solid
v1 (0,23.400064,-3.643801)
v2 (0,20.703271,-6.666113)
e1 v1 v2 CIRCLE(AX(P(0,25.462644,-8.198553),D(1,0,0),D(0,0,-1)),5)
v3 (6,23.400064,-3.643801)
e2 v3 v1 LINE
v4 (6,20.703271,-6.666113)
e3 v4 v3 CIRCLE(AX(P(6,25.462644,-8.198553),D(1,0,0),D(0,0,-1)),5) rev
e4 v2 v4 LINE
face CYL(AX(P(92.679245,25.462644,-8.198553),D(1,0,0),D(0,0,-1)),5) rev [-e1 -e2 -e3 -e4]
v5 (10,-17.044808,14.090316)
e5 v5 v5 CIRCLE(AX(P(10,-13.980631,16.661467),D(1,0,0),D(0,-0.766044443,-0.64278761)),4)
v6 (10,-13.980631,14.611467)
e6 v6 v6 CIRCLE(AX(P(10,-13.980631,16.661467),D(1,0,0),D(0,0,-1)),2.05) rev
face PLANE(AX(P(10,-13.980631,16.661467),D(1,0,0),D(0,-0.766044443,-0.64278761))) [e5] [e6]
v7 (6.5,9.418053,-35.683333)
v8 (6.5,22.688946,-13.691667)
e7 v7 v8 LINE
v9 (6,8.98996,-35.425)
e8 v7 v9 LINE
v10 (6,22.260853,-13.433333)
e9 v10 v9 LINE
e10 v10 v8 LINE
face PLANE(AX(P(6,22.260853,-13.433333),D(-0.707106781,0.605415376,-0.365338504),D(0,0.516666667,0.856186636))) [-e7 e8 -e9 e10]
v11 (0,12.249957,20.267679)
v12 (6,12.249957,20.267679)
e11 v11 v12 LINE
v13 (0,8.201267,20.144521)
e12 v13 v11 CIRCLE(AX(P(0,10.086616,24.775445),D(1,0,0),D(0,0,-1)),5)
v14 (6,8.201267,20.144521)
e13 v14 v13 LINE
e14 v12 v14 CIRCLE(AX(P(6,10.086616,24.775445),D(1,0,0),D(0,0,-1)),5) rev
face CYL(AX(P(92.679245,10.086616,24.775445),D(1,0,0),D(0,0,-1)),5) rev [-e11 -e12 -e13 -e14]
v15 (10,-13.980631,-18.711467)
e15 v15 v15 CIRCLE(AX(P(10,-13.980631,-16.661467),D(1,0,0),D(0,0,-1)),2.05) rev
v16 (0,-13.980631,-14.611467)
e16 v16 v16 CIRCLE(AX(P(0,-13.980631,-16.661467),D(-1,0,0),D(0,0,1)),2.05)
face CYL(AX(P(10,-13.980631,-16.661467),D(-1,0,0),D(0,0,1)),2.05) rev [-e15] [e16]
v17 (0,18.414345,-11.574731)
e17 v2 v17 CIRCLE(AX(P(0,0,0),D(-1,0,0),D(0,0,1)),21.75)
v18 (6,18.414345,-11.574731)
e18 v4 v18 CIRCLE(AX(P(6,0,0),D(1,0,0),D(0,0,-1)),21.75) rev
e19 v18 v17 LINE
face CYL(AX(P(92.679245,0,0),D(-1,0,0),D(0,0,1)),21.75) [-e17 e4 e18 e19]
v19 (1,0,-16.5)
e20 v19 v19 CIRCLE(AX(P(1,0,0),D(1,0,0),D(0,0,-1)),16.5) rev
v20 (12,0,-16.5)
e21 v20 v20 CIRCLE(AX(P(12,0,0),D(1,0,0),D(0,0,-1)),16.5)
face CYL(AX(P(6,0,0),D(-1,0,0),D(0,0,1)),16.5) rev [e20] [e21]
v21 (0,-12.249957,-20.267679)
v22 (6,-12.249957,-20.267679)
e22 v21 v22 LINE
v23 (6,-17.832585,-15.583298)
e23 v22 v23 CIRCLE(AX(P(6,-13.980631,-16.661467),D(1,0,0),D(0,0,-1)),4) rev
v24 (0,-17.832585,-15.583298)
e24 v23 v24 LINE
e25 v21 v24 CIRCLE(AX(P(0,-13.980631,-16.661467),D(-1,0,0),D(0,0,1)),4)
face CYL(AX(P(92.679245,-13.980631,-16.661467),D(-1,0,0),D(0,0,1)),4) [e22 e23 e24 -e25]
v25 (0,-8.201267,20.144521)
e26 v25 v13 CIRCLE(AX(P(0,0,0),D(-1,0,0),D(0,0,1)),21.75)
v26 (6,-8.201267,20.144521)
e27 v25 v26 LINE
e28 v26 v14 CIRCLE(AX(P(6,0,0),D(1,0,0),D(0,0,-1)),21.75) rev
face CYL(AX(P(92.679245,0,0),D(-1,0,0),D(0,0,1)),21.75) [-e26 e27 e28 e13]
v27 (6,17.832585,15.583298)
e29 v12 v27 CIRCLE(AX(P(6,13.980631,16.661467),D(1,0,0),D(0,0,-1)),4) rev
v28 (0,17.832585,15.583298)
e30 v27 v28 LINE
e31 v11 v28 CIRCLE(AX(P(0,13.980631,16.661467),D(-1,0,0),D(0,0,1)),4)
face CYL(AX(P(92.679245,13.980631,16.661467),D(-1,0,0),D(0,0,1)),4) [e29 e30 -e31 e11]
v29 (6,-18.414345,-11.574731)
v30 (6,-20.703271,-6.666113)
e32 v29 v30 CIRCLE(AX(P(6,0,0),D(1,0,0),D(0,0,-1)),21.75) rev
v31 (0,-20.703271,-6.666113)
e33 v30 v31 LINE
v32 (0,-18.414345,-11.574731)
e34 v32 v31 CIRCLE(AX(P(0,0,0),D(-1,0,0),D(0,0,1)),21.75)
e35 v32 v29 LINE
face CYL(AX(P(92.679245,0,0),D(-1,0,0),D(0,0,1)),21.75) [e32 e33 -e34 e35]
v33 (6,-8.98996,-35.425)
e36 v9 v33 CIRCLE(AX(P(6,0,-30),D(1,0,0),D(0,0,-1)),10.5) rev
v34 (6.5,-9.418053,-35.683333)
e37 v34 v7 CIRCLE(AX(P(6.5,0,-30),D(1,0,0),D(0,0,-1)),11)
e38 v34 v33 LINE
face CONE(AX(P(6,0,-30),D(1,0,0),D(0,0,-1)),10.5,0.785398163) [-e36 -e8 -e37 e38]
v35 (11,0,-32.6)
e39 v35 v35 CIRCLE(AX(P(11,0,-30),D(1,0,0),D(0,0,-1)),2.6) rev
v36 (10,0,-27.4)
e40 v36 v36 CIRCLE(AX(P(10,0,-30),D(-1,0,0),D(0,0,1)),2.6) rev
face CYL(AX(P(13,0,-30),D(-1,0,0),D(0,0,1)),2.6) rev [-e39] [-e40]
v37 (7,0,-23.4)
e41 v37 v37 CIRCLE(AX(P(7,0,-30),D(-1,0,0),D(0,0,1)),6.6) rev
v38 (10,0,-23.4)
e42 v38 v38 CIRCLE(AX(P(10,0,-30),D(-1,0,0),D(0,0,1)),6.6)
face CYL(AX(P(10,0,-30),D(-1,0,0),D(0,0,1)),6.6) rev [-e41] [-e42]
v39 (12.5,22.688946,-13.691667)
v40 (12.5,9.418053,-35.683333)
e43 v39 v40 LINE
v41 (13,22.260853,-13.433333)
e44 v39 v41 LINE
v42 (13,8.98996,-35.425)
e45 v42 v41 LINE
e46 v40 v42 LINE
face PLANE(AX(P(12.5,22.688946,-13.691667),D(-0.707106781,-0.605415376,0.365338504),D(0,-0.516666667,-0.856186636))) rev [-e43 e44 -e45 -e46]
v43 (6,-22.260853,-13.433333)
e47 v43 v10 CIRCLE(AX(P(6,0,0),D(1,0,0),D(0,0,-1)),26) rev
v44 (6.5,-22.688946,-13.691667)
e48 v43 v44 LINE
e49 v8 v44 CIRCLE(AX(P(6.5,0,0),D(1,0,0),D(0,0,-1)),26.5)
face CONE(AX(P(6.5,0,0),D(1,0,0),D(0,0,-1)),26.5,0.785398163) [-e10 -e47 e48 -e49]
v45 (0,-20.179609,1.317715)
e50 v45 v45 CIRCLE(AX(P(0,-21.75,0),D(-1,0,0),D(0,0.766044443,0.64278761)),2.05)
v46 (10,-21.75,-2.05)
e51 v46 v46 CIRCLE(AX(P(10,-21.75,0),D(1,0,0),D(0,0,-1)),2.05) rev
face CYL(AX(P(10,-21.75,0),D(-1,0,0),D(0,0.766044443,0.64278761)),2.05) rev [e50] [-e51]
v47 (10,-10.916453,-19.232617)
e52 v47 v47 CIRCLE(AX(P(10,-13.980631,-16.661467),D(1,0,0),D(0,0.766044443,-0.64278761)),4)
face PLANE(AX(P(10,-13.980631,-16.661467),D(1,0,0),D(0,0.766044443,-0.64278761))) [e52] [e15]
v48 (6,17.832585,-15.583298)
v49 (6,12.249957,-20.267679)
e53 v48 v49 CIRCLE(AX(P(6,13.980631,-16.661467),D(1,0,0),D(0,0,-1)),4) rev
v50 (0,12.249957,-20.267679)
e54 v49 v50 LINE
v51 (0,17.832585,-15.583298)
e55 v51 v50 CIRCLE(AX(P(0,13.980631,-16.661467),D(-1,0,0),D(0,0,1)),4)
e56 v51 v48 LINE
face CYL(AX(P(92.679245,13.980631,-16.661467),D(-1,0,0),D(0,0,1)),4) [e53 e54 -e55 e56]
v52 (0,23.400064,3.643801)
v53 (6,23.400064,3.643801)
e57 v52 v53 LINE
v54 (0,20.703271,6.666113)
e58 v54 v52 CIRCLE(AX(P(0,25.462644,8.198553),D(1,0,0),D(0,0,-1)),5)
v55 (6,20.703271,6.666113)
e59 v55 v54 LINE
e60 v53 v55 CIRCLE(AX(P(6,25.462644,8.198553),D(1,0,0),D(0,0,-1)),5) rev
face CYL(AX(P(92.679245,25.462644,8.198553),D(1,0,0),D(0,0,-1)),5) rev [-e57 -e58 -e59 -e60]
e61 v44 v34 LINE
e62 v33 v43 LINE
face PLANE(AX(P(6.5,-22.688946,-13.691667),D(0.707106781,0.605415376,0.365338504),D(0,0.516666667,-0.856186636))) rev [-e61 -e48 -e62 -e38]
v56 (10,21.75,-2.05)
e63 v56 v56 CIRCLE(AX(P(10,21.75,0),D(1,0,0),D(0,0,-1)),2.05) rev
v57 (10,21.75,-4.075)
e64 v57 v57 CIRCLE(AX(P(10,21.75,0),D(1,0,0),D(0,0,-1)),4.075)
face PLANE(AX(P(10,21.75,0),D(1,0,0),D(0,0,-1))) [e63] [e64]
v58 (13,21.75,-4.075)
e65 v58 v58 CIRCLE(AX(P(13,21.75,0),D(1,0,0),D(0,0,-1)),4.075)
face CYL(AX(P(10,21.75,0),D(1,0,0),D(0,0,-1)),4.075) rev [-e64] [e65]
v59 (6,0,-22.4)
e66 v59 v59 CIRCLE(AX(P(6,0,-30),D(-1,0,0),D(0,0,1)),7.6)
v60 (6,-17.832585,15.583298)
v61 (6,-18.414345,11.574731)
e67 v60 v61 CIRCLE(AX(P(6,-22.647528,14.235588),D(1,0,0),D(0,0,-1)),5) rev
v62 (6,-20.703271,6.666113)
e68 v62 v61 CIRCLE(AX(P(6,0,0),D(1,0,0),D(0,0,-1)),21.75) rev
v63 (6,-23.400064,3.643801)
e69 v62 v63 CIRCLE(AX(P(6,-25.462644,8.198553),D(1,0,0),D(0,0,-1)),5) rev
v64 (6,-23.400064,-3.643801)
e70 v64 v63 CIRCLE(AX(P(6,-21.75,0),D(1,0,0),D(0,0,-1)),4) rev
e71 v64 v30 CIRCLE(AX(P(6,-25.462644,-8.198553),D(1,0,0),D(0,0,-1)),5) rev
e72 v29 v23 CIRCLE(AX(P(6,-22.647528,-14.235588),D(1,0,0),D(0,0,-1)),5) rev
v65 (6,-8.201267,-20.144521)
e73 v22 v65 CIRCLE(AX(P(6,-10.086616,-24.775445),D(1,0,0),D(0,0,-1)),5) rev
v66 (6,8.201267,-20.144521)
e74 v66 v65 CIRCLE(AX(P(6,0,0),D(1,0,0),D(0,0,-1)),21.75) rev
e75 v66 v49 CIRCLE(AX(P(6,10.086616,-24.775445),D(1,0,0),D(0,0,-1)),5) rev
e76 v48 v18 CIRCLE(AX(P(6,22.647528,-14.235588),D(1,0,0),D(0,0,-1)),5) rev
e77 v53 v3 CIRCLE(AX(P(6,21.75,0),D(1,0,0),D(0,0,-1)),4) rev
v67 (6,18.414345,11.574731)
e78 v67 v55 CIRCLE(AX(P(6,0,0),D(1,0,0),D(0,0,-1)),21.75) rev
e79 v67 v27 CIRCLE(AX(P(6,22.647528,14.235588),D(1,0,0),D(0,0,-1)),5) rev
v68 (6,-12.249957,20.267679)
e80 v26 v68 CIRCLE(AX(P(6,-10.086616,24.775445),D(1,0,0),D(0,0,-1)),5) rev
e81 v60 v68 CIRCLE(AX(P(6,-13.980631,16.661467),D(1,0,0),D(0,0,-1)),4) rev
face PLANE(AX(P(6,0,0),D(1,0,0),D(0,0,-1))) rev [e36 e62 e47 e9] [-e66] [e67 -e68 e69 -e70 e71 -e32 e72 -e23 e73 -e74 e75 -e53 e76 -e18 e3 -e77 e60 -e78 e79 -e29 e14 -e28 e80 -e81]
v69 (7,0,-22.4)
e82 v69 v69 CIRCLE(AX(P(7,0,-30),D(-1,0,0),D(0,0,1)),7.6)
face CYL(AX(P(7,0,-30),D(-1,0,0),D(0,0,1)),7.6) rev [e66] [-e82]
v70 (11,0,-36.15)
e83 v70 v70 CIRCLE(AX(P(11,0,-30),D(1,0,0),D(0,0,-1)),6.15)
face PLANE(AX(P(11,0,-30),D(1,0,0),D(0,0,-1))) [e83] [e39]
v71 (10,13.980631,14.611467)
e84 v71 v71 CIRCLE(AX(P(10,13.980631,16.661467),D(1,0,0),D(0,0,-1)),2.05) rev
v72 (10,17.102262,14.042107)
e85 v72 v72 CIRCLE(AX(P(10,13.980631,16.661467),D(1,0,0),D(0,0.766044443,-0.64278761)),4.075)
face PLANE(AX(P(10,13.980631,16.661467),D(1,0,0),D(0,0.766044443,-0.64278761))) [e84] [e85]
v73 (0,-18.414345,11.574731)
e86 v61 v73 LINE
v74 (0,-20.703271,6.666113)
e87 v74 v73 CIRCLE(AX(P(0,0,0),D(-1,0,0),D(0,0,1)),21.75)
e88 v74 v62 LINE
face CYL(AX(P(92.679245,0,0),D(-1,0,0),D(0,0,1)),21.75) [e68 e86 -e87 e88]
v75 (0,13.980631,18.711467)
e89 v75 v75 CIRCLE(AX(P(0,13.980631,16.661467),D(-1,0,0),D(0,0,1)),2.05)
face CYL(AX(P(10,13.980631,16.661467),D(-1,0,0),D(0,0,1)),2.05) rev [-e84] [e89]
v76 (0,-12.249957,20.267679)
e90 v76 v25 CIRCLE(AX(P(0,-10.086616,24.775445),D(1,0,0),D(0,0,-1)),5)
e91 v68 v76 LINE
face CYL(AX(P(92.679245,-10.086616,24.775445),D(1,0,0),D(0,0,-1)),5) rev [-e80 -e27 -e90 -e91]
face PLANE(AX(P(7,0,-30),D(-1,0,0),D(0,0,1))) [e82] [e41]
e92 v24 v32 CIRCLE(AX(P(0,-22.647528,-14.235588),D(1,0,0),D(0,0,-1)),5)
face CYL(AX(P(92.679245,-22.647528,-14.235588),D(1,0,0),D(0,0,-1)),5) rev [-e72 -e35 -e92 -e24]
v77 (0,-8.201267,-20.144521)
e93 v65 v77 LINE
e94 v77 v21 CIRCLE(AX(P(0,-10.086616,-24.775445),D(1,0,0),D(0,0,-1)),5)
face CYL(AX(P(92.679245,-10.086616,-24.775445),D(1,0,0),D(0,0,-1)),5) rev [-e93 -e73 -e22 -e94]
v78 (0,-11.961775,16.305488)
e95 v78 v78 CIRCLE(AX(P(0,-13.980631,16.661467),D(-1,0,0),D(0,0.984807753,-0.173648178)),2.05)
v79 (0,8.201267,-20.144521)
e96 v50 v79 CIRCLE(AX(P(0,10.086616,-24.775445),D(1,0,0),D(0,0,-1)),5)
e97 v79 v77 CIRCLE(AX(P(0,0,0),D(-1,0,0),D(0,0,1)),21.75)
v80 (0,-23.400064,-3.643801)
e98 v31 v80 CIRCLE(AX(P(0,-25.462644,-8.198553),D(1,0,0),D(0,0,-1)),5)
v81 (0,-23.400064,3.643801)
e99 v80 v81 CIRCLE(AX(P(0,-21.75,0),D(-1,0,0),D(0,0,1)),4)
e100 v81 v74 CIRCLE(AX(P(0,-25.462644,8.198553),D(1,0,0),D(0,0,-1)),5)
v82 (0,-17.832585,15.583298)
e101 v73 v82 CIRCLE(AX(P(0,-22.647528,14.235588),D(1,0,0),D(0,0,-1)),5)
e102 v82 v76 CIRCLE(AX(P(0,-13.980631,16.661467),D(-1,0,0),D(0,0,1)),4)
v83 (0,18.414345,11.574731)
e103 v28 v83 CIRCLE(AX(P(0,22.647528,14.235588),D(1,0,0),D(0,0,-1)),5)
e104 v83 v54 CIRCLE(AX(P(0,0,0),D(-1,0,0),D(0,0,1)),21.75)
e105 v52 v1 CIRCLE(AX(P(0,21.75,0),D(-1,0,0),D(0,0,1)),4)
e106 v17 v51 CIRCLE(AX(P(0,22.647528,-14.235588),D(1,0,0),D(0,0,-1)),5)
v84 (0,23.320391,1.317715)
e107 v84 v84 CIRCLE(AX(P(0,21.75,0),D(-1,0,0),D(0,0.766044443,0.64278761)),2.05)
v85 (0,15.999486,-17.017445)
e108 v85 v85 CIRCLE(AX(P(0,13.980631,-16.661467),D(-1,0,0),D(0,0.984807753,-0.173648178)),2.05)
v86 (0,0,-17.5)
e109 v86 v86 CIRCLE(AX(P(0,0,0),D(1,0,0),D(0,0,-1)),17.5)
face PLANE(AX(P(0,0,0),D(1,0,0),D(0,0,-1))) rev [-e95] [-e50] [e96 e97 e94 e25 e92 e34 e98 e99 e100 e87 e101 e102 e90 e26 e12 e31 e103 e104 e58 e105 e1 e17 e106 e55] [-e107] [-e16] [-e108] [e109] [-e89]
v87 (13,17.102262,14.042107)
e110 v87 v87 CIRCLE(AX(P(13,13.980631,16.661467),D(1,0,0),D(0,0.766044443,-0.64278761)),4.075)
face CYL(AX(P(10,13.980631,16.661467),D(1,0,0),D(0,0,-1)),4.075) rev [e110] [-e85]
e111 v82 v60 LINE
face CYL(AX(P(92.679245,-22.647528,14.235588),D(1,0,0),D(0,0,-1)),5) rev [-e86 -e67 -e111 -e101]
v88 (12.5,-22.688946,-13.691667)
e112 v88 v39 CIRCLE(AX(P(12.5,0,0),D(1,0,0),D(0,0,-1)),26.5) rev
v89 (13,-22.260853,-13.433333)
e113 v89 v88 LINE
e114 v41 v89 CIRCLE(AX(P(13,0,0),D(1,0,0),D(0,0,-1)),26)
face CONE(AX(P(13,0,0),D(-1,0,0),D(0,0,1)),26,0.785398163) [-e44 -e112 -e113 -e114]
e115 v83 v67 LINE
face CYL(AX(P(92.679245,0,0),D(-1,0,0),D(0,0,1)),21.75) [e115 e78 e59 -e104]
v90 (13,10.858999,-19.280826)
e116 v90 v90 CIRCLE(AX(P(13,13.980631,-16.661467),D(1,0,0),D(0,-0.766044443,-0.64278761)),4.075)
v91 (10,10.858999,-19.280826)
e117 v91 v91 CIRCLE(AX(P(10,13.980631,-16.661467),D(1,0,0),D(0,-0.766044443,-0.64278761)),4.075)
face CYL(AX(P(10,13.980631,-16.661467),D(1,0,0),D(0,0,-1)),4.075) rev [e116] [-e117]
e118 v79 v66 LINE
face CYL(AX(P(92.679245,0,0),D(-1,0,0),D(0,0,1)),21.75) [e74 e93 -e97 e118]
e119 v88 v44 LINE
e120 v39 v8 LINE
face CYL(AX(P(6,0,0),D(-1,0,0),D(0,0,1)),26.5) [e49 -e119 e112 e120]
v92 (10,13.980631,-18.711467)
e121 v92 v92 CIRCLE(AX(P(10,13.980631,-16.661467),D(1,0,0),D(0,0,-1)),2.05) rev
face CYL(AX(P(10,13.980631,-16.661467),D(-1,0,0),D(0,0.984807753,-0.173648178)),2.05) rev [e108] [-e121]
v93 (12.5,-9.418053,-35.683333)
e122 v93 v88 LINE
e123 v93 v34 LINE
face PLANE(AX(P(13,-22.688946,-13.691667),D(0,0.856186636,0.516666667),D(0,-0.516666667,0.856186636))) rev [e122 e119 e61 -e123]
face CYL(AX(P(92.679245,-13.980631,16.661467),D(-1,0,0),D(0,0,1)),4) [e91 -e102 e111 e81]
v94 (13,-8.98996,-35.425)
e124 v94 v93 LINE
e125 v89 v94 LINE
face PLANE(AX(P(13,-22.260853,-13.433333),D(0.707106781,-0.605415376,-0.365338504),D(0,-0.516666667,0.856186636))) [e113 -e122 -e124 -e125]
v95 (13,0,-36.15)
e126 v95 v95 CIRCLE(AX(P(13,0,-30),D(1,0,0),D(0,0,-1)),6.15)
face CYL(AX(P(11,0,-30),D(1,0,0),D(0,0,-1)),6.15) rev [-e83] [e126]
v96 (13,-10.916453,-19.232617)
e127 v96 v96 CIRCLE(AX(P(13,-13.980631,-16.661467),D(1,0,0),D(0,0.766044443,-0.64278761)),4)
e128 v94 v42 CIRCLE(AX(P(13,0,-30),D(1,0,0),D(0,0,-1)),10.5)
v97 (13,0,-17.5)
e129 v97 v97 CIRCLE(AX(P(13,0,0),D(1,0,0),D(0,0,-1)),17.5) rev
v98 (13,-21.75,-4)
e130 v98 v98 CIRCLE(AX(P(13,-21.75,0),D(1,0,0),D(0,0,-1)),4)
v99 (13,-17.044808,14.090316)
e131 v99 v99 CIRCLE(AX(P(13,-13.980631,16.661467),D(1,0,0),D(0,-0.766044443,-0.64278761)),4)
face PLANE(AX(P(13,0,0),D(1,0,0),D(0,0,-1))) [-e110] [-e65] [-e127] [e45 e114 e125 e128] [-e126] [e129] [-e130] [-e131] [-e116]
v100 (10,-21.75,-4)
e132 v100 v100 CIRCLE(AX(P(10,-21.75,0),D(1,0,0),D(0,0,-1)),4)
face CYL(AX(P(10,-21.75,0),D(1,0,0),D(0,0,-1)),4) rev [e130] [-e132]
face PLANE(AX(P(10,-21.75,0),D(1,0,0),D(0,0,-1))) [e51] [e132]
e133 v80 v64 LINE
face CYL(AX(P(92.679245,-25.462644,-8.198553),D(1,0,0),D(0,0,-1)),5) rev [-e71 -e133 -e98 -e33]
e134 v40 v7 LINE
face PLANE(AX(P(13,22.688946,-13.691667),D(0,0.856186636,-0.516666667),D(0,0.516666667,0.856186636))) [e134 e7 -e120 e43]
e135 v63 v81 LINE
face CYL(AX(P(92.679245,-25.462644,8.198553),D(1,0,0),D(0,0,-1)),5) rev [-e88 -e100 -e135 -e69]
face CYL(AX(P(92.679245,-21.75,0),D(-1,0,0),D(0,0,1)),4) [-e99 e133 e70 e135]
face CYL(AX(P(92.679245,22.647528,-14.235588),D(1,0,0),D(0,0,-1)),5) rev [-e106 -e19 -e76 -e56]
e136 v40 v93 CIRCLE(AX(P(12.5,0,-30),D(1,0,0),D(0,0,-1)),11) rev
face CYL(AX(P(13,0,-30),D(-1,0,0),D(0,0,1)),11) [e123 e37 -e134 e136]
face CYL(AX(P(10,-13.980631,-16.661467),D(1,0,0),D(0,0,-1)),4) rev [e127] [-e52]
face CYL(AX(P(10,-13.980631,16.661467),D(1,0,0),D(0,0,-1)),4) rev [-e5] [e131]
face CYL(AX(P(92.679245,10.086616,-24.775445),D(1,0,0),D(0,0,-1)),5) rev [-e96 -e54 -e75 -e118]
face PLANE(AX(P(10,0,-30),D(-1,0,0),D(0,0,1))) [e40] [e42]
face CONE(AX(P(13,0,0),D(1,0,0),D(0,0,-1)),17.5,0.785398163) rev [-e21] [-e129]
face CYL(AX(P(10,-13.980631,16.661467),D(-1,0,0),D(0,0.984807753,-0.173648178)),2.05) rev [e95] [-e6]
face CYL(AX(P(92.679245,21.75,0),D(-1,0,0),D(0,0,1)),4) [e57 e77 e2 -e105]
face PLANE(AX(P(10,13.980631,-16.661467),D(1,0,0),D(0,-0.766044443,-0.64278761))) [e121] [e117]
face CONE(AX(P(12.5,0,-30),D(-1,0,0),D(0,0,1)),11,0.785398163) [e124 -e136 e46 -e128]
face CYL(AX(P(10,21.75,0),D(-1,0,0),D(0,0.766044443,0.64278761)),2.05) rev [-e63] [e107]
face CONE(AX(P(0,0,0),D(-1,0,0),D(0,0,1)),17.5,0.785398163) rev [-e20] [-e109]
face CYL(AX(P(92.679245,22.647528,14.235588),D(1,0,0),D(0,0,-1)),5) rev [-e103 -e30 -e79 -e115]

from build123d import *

# Parameters (mm, degrees)
SKETCH_1_R               = 26.5
SKETCH_1_R_2             = 16.5
EXTRUDE_1_DEPTH          = 6
SKETCH_2_R               = 2.05
CUT_EXTRUDE_1_DEPTH      = 10
PATTERN_CIRCULAR_1_COUNT = 3
PATTERN_CIRCULAR_1_ANGLE = 100
SKETCH_3_R               = 2.05
SKETCH_3_R_2             = 2.6
SKETCH_3_R_3             = 16.5
EXTRUDE_2_DEPTH          = 7
CUT_EXTRUDE_START        = -6
CUT_EXTRUDE_2_OUTLINE_R  = 26.5
CUT_EXTRUDE_2_DEPTH      = 6
CHAMFER_1_SIZE           = 1
FILLET_1_R               = 5
SKETCH_5_R               = 4.075
SKETCH_5_R_2             = 4
CUT_EXTRUDE_3_DEPTH      = 3
PATTERN_CIRCULAR_2_COUNT = 2
PATTERN_CIRCULAR_2_ANGLE = 50
F_2_THE_OTHER_WAY_COUNT  = 2
F_2_THE_OTHER_WAY_ANGLE  = 50
SKETCH_6_R               = 6.6
CUT_EXTRUDE_4_DEPTH      = 4
SKETCH_7_R               = 7.6
CUT_EXTRUDE_5_DEPTH      = 1
SKETCH_8_R               = 6.15
CUT_EXTRUDE_6_DEPTH      = 2
CHAMFER_2_SIZE           = 0.5


# Read off the part's stored shape, not the designer's step: 切除-拉伸2
with BuildPart() as part:
    # 草图1 → 凸台-拉伸1 (new body)
    with BuildSketch(Plane(origin=(0, 0, 0), x_dir=(0, 0, -1), z_dir=(1, 0, 0))):
        Circle(SKETCH_1_R)
        Circle(SKETCH_1_R_2, mode=Mode.SUBTRACT)
    extrude(amount=EXTRUDE_1_DEPTH)

    # 草图2 → 切除-拉伸1 (cut)
    with BuildSketch(Plane.ZY):
        with Locations((16.661466638, 13.980630511)):
            Circle(SKETCH_2_R)
        with Locations((-16.661466638, -13.980630511)):
            Circle(SKETCH_2_R)
    cut_extrude_1 = extrude(amount=-CUT_EXTRUDE_1_DEPTH, mode=Mode.SUBTRACT)

    # 阵列(圆周)1: 切除-拉伸1 ×3 about axis
    pattern_circular_1_axis = Axis((0, 0, 0), (-1, 0, 0))
    for i in range(1, PATTERN_CIRCULAR_1_COUNT):
        add(cut_extrude_1.rotate(pattern_circular_1_axis, i * PATTERN_CIRCULAR_1_ANGLE / (PATTERN_CIRCULAR_1_COUNT - 1)), mode=Mode.SUBTRACT)

    # 草图3 → 凸台-拉伸2 (add)
    with BuildSketch(Plane.ZY.offset(-6)):
        with BuildLine():
            ThreePointArc((-35.683333333, 9.418052995), (-41, 0), (-35.683333333, -9.418052995))
            Line((-35.683333333, -9.418052995), (-13.691666667, -22.688945852))
            ThreePointArc((-13.691666667, -22.688945852), (26.5, 0), (-13.691666667, 22.688945852))
            Line((-13.691666667, 22.688945852), (-35.683333333, 9.418052995))
        make_face()
        with Locations((-16.661466638, -13.980630511)):
            Circle(SKETCH_3_R, mode=Mode.SUBTRACT)
        with Locations(Location((0, -21.75, 0), (0, 0, 50))):
            Circle(SKETCH_3_R, mode=Mode.SUBTRACT)
        with Locations(Location((16.661466638, -13.980630511, 0), (0, 0, 100))):
            Circle(SKETCH_3_R, mode=Mode.SUBTRACT)
        with Locations(Location((-30, 0, 0), (0, 0, 180))):
            Circle(SKETCH_3_R_2, mode=Mode.SUBTRACT)
        with Locations(Location((-16.661466638, 13.980630511, 0), (0, 0, 100))):
            Circle(SKETCH_3_R, mode=Mode.SUBTRACT)
        with Locations(Location((0, 0, 0), (0, 0, 180))):
            Circle(SKETCH_3_R_3, mode=Mode.SUBTRACT)
        with Locations(Location((0, 21.75, 0), (0, 0, 50))):
            Circle(SKETCH_3_R, mode=Mode.SUBTRACT)
        with Locations((16.661466638, 13.980630511)):
            Circle(SKETCH_3_R, mode=Mode.SUBTRACT)
    extrude(amount=-EXTRUDE_2_DEPTH)

    # 切除-拉伸2 outline → 切除-拉伸2 (cut)
    with BuildSketch(Plane.ZY.offset(CUT_EXTRUDE_START)):
        Circle(CUT_EXTRUDE_2_OUTLINE_R)
        with BuildLine():
            ThreePointArc((-18.939960291, -10.693007255), (-21.75, 0), (-18.939960291, 10.693007255))
            ThreePointArc((-18.939960291, 10.693007255), (-19.72564441, 16.551780949), (-13.819446038, 16.795398513))
            ThreePointArc((-13.819446038, 16.795398513), (-9.191947193, 19.712194368), (-3.983053015, 21.382183908))
            ThreePointArc((-3.983053015, 21.382183908), (0, 25.75), (3.983053015, 21.382183908))
            ThreePointArc((3.983053015, 21.382183908), (9.191947193, 19.712194368), (13.819446038, 16.795398513))
            ThreePointArc((13.819446038, 16.795398513), (19.72564441, 16.551780949), (18.939960291, 10.693007255))
            ThreePointArc((18.939960291, 10.693007255), (21.75, 0), (18.939960291, -10.693007255))
            ThreePointArc((18.939960291, -10.693007255), (19.72564441, -16.551780949), (13.819446038, -16.795398513))
            ThreePointArc((13.819446038, -16.795398513), (9.191947193, -19.712194368), (3.983053015, -21.382183908))
            ThreePointArc((3.983053015, -21.382183908), (0, -25.75), (-3.983053015, -21.382183908))
            ThreePointArc((-3.983053015, -21.382183908), (-9.191947193, -19.712194368), (-13.819446038, -16.795398513))
            ThreePointArc((-13.819446038, -16.795398513), (-19.72564441, -16.551780949), (-18.939960291, -10.693007255))
        make_face(mode=Mode.SUBTRACT)
    extrude(amount=CUT_EXTRUDE_2_DEPTH, mode=Mode.SUBTRACT)

    # 倒角1
    chamfer_1_edges = [part.edges().sort_by_distance(p)[0] for p in [
        (13, 0, 16.5),
        (0, 0, 16.5),
    ]]
    chamfer(chamfer_1_edges, length=CHAMFER_1_SIZE)

    # 圆角1
    fillet_1_edges = [part.edges().sort_by_distance(p)[0] for p in [
        (3, 10.693007255, -18.939960291),
        (3, -10.693007255, -18.939960291),
        (3, -16.795398513, -13.819446038),
        (3, -21.382183908, -3.983053015),
        (3, -21.382183908, 3.983053015),
        (3, -16.795398513, 13.819446038),
        (3, -10.693007255, 18.939960291),
        (3, 10.693007255, 18.939960291),
        (3, 16.795398513, 13.819446038),
        (3, 21.382183908, 3.983053015),
        (3, 21.382183908, -3.983053015),
        (3, 16.795398513, -13.819446038),
    ]]
    fillet(fillet_1_edges, radius=FILLET_1_R)

    # 草图5 → 切除-拉伸3 (cut)
    with BuildSketch(Plane(origin=(13, 0, 0), x_dir=(0, 0, -1), z_dir=(1, 0, 0))):
        with Locations((0, 21.75)):
            Circle(SKETCH_5_R)
        with Locations((0, -21.75)):
            Circle(SKETCH_5_R_2)
    cut_extrude_3 = extrude(amount=-CUT_EXTRUDE_3_DEPTH, mode=Mode.SUBTRACT)

    # 阵列(圆周)2: 切除-拉伸3 ×2 about axis
    pattern_circular_2_axis = Axis((0, 0, 0), (-1, 0, 0))
    for i in range(1, PATTERN_CIRCULAR_2_COUNT):
        add(cut_extrude_3.rotate(pattern_circular_2_axis, i * PATTERN_CIRCULAR_2_ANGLE / (PATTERN_CIRCULAR_2_COUNT - 1)), mode=Mode.SUBTRACT)

    # 2 the other way: 切除-拉伸3 ×2 about axis
    f_2_the_other_way_axis = Axis((0, 0, 0), (1, 0, 0))
    for i in range(1, F_2_THE_OTHER_WAY_COUNT):
        add(cut_extrude_3.rotate(f_2_the_other_way_axis, i * F_2_THE_OTHER_WAY_ANGLE / (F_2_THE_OTHER_WAY_COUNT - 1)), mode=Mode.SUBTRACT)

    # 草图6 → 切除-拉伸4 (cut)
    with BuildSketch(Plane.ZY.offset(-6)):
        with Locations((-30, 0)):
            Circle(SKETCH_6_R)
    extrude(amount=-CUT_EXTRUDE_4_DEPTH, mode=Mode.SUBTRACT)

    # 草图7 → 切除-拉伸5 (cut)
    with BuildSketch(Plane.ZY.offset(-6)):
        with Locations((-30, 0)):
            Circle(SKETCH_7_R)
    extrude(amount=-CUT_EXTRUDE_5_DEPTH, mode=Mode.SUBTRACT)

    # 草图8 → 切除-拉伸6 (cut)
    with BuildSketch(Plane(origin=(13, 0, 0), x_dir=(0, 0, -1), z_dir=(1, 0, 0))):
        with Locations((30, 0)):
            Circle(SKETCH_8_R)
    extrude(amount=-CUT_EXTRUDE_6_DEPTH, mode=Mode.SUBTRACT)

    # 倒角2
    chamfer_2_edges = [part.edges().sort_by_distance(p)[0] for p in [
        (6, 16.053499424, -24.6875),
        (6, 0, -41),
        (13, 16.053499424, -24.6875),
        (6, -16.053499424, -24.6875),
        (13, 0, -41),
        (13, 0, 26.5),
        (13, -16.053499424, -24.6875),
        (6, 0, 26.5),
    ]]
    chamfer(chamfer_2_edges, length=CHAMFER_2_SIZE)


solid = part.part
